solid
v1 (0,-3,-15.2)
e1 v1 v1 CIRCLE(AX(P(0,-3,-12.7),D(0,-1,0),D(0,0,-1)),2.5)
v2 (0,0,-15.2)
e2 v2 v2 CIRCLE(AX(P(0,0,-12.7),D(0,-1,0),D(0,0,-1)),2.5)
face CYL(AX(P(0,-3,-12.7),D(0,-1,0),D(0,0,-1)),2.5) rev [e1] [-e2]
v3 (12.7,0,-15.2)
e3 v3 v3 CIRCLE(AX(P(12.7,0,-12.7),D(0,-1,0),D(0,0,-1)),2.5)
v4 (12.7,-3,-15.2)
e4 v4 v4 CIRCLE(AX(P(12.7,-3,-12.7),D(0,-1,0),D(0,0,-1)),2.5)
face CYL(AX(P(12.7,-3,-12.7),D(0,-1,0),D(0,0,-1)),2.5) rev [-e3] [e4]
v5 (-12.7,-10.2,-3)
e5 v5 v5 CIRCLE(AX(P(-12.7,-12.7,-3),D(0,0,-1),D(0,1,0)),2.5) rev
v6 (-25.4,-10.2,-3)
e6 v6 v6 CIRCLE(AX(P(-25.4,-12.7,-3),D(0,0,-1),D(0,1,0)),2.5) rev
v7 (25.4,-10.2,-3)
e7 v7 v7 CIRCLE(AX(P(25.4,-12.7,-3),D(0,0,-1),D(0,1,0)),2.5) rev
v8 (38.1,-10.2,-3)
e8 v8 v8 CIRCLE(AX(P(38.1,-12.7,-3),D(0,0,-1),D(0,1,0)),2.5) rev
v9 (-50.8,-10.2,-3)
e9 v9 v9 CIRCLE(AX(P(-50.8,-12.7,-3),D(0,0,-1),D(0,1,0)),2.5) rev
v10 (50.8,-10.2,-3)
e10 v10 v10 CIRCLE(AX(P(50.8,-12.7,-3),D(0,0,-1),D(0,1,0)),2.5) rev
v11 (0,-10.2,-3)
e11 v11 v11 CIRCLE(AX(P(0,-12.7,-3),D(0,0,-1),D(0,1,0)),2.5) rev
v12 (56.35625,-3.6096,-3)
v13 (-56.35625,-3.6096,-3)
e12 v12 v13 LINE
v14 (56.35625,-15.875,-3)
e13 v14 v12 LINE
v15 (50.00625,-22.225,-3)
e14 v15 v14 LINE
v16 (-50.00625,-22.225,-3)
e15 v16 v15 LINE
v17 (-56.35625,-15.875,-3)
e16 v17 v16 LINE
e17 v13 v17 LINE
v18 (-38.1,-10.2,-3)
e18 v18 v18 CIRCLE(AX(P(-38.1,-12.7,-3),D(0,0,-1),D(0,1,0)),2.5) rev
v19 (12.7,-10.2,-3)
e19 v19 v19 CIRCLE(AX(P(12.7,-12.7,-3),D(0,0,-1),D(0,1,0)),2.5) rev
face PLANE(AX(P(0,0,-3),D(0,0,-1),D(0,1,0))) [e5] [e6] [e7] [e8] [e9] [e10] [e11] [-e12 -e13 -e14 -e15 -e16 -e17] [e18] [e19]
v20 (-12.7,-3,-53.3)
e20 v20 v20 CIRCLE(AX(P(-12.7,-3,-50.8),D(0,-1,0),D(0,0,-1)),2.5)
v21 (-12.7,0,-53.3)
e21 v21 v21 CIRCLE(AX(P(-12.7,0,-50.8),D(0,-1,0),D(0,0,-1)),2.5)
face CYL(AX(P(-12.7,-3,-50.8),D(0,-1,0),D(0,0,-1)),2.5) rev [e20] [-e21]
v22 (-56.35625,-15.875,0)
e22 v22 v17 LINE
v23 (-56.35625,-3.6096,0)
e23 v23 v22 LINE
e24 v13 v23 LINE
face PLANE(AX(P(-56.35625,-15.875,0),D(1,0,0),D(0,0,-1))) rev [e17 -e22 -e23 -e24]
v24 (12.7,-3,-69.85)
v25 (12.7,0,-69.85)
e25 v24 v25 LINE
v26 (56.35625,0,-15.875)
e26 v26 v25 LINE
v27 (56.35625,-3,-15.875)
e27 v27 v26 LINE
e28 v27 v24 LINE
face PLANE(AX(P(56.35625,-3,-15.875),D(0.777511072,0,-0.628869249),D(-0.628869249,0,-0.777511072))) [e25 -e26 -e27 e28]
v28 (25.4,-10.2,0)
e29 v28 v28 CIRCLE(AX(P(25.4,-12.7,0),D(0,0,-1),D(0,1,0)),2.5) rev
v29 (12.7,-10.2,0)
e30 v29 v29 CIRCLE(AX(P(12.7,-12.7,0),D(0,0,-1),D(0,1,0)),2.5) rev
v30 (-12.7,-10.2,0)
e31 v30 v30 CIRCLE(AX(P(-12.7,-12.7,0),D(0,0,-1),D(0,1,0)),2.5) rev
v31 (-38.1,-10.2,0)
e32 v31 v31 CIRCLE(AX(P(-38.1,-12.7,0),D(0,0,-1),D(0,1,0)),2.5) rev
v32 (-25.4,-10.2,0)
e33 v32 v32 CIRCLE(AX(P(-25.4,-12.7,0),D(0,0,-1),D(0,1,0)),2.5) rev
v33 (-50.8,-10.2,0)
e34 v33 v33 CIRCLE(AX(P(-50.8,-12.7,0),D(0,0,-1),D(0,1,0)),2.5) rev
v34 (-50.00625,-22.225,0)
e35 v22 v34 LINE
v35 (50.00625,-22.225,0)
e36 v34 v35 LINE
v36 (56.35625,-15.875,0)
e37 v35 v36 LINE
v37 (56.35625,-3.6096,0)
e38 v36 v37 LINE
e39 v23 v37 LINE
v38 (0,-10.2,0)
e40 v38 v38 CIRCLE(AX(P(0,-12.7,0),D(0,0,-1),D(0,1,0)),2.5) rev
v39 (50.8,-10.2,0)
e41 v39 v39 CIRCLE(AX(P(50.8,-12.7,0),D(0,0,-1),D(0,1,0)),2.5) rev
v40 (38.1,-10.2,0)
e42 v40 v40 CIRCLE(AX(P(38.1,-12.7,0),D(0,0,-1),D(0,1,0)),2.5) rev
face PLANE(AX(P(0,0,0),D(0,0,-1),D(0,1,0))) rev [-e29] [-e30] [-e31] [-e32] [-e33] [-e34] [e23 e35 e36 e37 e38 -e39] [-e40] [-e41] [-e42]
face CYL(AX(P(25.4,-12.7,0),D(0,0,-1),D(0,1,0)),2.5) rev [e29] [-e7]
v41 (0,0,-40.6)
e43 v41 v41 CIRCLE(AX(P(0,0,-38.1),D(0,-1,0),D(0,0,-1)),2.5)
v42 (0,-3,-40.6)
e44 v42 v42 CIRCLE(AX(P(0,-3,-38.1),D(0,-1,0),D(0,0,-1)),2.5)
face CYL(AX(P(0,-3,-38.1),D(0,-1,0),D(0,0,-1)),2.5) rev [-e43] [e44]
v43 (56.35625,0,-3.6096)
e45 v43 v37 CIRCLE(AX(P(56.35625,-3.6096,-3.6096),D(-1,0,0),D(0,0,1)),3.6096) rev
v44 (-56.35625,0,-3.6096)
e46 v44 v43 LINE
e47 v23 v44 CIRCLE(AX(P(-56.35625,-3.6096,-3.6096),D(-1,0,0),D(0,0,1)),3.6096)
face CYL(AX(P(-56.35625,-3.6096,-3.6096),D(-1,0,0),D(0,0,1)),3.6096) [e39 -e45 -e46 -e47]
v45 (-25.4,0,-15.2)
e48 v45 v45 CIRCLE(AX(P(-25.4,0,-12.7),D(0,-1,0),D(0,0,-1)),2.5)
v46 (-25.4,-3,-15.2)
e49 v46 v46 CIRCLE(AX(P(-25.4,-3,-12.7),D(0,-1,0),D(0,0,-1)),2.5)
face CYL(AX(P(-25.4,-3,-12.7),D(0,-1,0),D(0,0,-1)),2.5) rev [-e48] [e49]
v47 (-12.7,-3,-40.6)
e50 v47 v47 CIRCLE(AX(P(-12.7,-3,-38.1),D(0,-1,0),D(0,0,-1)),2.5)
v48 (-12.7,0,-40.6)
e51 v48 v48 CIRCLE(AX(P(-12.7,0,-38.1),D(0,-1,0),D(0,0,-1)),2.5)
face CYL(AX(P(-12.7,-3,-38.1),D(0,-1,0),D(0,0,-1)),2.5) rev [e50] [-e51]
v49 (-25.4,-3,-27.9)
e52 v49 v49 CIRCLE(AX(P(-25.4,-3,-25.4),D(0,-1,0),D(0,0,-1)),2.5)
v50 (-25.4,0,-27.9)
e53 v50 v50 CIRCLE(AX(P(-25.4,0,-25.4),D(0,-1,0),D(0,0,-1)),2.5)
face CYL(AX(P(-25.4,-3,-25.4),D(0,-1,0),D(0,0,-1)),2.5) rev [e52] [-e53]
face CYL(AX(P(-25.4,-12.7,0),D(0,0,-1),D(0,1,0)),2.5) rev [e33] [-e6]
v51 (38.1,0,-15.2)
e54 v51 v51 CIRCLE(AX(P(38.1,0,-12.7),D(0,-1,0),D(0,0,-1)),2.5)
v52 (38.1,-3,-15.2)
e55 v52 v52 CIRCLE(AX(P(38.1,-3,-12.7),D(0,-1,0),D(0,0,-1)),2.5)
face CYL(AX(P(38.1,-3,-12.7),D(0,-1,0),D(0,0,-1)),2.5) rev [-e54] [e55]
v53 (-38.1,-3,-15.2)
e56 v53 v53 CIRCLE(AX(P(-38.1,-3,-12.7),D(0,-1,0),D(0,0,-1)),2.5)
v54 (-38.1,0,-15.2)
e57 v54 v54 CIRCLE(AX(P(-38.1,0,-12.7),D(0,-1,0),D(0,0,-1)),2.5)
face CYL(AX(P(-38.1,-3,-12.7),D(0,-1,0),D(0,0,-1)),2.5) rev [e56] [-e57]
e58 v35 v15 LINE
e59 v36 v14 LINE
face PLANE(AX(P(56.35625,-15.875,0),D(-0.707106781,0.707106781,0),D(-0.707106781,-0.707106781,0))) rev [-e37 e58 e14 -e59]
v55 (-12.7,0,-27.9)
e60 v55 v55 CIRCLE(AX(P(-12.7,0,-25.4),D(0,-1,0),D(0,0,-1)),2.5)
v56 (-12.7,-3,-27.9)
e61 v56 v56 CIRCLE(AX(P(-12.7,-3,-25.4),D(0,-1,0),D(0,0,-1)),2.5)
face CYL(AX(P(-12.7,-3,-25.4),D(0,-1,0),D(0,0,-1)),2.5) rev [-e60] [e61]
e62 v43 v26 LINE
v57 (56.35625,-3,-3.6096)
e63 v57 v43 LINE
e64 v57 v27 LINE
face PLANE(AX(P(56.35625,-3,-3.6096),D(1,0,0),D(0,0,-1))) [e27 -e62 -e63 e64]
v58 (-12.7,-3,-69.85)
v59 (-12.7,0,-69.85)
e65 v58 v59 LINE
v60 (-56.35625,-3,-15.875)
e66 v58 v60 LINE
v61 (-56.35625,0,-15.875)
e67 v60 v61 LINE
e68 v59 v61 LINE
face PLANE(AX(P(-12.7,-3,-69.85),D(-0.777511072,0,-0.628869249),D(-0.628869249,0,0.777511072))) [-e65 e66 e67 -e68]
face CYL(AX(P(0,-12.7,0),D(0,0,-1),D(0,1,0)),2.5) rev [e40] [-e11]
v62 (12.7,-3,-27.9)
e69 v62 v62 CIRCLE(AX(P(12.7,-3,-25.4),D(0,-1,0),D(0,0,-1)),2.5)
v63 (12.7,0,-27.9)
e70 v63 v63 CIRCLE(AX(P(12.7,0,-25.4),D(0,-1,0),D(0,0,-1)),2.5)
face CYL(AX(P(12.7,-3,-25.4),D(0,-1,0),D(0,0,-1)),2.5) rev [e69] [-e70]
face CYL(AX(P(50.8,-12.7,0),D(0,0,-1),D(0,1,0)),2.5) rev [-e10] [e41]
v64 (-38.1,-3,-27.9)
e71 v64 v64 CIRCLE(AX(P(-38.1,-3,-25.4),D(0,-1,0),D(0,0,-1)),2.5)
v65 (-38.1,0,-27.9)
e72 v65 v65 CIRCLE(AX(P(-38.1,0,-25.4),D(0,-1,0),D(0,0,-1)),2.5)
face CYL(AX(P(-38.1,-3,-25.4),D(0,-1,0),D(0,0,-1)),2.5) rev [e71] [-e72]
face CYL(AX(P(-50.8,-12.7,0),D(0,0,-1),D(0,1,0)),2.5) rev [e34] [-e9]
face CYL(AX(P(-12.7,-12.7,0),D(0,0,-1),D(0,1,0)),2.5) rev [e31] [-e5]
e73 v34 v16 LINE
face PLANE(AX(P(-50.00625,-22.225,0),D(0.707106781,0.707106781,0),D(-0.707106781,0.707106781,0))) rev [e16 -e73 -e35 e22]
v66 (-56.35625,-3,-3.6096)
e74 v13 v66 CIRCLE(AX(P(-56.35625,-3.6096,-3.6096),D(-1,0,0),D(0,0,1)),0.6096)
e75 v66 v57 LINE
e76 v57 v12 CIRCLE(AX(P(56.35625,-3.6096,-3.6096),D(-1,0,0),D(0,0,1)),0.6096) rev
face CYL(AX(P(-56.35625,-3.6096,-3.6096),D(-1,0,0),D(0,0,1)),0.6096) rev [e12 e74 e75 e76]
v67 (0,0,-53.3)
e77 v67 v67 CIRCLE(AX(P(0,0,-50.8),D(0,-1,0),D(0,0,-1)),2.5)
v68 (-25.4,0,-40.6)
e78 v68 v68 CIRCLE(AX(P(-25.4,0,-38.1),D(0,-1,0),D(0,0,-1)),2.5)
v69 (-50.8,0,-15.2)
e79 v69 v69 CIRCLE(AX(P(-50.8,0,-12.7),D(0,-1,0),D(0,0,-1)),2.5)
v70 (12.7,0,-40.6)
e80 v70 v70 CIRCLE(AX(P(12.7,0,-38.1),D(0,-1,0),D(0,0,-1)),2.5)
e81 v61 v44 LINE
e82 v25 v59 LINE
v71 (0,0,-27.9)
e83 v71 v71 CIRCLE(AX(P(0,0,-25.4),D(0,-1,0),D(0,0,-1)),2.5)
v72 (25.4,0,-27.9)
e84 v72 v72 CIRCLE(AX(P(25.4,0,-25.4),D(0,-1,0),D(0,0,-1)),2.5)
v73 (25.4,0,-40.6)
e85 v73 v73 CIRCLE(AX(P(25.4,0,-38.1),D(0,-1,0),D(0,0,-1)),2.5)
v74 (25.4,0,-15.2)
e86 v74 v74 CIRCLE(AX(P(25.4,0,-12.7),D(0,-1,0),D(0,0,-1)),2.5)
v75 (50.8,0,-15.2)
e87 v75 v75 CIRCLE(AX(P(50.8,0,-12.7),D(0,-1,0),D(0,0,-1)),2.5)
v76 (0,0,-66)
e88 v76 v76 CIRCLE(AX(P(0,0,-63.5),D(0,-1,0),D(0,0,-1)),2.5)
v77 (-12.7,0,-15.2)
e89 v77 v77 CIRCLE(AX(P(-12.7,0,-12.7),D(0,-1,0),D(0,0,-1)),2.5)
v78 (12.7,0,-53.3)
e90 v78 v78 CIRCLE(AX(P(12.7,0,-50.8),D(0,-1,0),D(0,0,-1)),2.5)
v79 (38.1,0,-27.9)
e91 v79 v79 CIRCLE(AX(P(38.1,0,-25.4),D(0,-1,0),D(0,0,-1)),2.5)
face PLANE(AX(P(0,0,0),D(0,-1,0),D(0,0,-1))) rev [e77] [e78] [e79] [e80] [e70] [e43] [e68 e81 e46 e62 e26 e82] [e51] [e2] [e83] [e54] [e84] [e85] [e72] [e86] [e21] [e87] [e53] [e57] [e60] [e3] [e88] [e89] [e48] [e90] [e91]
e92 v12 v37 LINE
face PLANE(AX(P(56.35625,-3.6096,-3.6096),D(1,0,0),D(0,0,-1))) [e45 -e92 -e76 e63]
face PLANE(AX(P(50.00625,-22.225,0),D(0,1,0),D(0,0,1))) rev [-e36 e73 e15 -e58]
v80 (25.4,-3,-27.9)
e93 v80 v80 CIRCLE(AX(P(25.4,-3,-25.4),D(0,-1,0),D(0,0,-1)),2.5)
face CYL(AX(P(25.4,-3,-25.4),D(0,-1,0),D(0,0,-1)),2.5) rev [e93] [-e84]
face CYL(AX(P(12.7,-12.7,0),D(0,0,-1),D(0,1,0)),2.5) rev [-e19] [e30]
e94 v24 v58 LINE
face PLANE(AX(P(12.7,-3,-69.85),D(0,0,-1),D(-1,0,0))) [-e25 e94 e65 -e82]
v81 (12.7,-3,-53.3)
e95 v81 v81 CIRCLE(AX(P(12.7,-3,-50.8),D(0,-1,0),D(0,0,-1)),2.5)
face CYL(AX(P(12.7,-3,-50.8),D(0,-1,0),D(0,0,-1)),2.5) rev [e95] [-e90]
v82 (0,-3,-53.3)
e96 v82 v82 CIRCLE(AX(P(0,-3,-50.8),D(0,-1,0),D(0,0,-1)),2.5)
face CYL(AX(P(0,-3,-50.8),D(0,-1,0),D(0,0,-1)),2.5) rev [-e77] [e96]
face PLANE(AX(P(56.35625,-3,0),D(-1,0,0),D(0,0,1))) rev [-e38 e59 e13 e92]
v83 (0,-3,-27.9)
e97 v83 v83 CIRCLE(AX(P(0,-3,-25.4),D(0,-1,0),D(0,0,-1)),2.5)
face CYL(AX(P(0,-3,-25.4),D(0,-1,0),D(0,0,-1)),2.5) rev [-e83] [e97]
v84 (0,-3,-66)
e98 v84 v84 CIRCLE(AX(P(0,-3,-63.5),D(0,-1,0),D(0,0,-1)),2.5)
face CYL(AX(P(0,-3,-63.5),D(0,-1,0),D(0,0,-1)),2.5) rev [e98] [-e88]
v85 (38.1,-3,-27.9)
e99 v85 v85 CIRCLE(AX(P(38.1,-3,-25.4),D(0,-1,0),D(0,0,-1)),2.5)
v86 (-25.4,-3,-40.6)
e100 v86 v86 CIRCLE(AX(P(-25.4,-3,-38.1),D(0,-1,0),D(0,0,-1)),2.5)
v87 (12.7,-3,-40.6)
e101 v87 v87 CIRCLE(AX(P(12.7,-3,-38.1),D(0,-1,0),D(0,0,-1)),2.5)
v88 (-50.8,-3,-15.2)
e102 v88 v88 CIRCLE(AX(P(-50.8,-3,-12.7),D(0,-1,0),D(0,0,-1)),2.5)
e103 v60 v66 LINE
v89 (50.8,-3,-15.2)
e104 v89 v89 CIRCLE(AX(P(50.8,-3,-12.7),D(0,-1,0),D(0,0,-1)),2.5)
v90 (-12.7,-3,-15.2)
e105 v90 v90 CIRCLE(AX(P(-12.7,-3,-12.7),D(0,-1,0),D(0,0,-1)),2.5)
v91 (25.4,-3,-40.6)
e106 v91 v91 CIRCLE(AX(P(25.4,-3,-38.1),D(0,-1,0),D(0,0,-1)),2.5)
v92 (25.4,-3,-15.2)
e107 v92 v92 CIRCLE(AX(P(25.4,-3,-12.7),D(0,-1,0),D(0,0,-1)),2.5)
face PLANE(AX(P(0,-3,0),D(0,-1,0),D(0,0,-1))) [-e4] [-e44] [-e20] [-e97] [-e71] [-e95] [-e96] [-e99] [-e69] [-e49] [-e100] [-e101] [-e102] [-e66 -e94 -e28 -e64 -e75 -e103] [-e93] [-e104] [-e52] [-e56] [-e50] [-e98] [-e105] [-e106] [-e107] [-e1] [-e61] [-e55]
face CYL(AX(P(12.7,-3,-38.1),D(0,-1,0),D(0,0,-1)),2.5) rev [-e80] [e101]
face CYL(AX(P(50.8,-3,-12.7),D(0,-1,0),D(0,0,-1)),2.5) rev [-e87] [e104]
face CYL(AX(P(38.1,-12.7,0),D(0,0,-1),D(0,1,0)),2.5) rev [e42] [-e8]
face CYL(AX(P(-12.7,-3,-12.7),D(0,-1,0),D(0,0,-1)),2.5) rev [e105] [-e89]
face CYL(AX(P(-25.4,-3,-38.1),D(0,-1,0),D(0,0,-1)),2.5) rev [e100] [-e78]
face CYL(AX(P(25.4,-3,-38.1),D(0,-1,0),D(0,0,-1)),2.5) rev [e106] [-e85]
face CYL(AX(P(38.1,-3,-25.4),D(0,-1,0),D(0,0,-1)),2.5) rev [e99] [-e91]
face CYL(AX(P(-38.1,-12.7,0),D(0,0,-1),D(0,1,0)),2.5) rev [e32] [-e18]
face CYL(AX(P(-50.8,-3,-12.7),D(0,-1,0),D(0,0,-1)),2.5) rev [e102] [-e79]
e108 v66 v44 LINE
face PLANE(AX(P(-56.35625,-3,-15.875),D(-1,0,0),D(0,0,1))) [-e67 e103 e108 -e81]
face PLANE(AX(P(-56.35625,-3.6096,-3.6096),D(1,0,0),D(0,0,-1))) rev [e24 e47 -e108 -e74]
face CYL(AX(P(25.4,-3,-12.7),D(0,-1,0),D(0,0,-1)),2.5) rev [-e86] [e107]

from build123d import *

# Parameters (mm, degrees)
BASE_FLANGE1_DEPTH      = 3
F_10_CLEARANCE_HOLE1_D  = 5
EDGE_FLANGE1_DEPTH      = 112.7125
EDGE_FLANGE1_START      = 3
EDGE_FLANGE1_PROFILE_R  = 2.5
EDGE_FLANGE1_FLAT_DEPTH = 3


# Sheet-metal steps are written as plain solids
with BuildPart() as part:
    # Sketch7 → Base-Flange1 (new body)
    with BuildSketch(Plane(origin=(0, 0, 0), x_dir=(1, 0, 0), z_dir=(0, 1, 0))):
        Polygon((-56.35625, 15.875), (-56.35625, 3.6096), (56.35625, 3.6096), (56.35625, 15.875), (12.7, 69.85), (-12.7, 69.85), align=None)
    extrude(amount=-BASE_FLANGE1_DEPTH)

    # #10 Clearance Hole1 (through all)
    with Locations(Plane(origin=(0, -3, 0), x_dir=(-1, 0, 0), z_dir=(0, -1, 0))):
        with Locations((-50.8, 12.7), (50.8, 12.7), (-38.1, 25.4), (38.1, 25.4), (-25.4, 38.1), (-38.1, 12.7), (-25.4, 12.7), (-25.4, 25.4), (38.1, 12.7), (25.4, 12.7), (25.4, 38.1), (25.4, 25.4), (12.7, 38.1), (12.7, 25.4), (12.7, 12.7), (-12.7, 12.7), (-12.7, 25.4), (-12.7, 38.1), (-12.7, 50.8), (12.7, 50.8), (0, 63.5), (0, 50.8), (0, 38.1), (0, 25.4), (0, 12.7)):
            Hole(F_10_CLEARANCE_HOLE1_D / 2)

    # Edge-Flange1 bend section (across the edge) → Edge-Flange1 (add)
    with BuildSketch(Plane(origin=(56.35625, -3, -3), x_dir=(0, 0, -1), z_dir=(-1, 0, 0))):
        with BuildLine():
            Line((-3, 0.6096), (0, 0.6096))
            ThreePointArc((0, 0.6096), (0.178547706, 0.178547706), (0.6096, 0))
            Line((0.6096, 0), (0.6096, -3))
            ThreePointArc((0.6096, -3), (-1.942772637, -1.942772637), (-3, 0.6096))
        make_face()
    extrude(amount=EDGE_FLANGE1_DEPTH)

    # Edge-Flange1 profile (on flange) → Edge-Flange1 flat (add)
    with BuildSketch(Plane(origin=(0, -3, -3), x_dir=(-1, 0, 0), z_dir=(0, 0, 1)).offset(EDGE_FLANGE1_START)):
        Polygon((-56.35625, 0.6096), (56.35625, 0.6096), (56.35625, 12.875), (50.00625, 19.225), (-50.00625, 19.225), (-56.35625, 12.875), align=None)
        with Locations((50.8, 9.7)):
            Circle(EDGE_FLANGE1_PROFILE_R, mode=Mode.SUBTRACT)
        with Locations((38.1, 9.7)):
            Circle(EDGE_FLANGE1_PROFILE_R, mode=Mode.SUBTRACT)
        with Locations((25.4, 9.7)):
            Circle(EDGE_FLANGE1_PROFILE_R, mode=Mode.SUBTRACT)
        with Locations((12.7, 9.7)):
            Circle(EDGE_FLANGE1_PROFILE_R, mode=Mode.SUBTRACT)
        with Locations((0, 9.7)):
            Circle(EDGE_FLANGE1_PROFILE_R, mode=Mode.SUBTRACT)
        with Locations((-12.7, 9.7)):
            Circle(EDGE_FLANGE1_PROFILE_R, mode=Mode.SUBTRACT)
        with Locations((-25.4, 9.7)):
            Circle(EDGE_FLANGE1_PROFILE_R, mode=Mode.SUBTRACT)
        with Locations((-38.1, 9.7)):
            Circle(EDGE_FLANGE1_PROFILE_R, mode=Mode.SUBTRACT)
        with Locations((-50.8, 9.7)):
            Circle(EDGE_FLANGE1_PROFILE_R, mode=Mode.SUBTRACT)
    extrude(amount=-EDGE_FLANGE1_FLAT_DEPTH)


solid = part.part
